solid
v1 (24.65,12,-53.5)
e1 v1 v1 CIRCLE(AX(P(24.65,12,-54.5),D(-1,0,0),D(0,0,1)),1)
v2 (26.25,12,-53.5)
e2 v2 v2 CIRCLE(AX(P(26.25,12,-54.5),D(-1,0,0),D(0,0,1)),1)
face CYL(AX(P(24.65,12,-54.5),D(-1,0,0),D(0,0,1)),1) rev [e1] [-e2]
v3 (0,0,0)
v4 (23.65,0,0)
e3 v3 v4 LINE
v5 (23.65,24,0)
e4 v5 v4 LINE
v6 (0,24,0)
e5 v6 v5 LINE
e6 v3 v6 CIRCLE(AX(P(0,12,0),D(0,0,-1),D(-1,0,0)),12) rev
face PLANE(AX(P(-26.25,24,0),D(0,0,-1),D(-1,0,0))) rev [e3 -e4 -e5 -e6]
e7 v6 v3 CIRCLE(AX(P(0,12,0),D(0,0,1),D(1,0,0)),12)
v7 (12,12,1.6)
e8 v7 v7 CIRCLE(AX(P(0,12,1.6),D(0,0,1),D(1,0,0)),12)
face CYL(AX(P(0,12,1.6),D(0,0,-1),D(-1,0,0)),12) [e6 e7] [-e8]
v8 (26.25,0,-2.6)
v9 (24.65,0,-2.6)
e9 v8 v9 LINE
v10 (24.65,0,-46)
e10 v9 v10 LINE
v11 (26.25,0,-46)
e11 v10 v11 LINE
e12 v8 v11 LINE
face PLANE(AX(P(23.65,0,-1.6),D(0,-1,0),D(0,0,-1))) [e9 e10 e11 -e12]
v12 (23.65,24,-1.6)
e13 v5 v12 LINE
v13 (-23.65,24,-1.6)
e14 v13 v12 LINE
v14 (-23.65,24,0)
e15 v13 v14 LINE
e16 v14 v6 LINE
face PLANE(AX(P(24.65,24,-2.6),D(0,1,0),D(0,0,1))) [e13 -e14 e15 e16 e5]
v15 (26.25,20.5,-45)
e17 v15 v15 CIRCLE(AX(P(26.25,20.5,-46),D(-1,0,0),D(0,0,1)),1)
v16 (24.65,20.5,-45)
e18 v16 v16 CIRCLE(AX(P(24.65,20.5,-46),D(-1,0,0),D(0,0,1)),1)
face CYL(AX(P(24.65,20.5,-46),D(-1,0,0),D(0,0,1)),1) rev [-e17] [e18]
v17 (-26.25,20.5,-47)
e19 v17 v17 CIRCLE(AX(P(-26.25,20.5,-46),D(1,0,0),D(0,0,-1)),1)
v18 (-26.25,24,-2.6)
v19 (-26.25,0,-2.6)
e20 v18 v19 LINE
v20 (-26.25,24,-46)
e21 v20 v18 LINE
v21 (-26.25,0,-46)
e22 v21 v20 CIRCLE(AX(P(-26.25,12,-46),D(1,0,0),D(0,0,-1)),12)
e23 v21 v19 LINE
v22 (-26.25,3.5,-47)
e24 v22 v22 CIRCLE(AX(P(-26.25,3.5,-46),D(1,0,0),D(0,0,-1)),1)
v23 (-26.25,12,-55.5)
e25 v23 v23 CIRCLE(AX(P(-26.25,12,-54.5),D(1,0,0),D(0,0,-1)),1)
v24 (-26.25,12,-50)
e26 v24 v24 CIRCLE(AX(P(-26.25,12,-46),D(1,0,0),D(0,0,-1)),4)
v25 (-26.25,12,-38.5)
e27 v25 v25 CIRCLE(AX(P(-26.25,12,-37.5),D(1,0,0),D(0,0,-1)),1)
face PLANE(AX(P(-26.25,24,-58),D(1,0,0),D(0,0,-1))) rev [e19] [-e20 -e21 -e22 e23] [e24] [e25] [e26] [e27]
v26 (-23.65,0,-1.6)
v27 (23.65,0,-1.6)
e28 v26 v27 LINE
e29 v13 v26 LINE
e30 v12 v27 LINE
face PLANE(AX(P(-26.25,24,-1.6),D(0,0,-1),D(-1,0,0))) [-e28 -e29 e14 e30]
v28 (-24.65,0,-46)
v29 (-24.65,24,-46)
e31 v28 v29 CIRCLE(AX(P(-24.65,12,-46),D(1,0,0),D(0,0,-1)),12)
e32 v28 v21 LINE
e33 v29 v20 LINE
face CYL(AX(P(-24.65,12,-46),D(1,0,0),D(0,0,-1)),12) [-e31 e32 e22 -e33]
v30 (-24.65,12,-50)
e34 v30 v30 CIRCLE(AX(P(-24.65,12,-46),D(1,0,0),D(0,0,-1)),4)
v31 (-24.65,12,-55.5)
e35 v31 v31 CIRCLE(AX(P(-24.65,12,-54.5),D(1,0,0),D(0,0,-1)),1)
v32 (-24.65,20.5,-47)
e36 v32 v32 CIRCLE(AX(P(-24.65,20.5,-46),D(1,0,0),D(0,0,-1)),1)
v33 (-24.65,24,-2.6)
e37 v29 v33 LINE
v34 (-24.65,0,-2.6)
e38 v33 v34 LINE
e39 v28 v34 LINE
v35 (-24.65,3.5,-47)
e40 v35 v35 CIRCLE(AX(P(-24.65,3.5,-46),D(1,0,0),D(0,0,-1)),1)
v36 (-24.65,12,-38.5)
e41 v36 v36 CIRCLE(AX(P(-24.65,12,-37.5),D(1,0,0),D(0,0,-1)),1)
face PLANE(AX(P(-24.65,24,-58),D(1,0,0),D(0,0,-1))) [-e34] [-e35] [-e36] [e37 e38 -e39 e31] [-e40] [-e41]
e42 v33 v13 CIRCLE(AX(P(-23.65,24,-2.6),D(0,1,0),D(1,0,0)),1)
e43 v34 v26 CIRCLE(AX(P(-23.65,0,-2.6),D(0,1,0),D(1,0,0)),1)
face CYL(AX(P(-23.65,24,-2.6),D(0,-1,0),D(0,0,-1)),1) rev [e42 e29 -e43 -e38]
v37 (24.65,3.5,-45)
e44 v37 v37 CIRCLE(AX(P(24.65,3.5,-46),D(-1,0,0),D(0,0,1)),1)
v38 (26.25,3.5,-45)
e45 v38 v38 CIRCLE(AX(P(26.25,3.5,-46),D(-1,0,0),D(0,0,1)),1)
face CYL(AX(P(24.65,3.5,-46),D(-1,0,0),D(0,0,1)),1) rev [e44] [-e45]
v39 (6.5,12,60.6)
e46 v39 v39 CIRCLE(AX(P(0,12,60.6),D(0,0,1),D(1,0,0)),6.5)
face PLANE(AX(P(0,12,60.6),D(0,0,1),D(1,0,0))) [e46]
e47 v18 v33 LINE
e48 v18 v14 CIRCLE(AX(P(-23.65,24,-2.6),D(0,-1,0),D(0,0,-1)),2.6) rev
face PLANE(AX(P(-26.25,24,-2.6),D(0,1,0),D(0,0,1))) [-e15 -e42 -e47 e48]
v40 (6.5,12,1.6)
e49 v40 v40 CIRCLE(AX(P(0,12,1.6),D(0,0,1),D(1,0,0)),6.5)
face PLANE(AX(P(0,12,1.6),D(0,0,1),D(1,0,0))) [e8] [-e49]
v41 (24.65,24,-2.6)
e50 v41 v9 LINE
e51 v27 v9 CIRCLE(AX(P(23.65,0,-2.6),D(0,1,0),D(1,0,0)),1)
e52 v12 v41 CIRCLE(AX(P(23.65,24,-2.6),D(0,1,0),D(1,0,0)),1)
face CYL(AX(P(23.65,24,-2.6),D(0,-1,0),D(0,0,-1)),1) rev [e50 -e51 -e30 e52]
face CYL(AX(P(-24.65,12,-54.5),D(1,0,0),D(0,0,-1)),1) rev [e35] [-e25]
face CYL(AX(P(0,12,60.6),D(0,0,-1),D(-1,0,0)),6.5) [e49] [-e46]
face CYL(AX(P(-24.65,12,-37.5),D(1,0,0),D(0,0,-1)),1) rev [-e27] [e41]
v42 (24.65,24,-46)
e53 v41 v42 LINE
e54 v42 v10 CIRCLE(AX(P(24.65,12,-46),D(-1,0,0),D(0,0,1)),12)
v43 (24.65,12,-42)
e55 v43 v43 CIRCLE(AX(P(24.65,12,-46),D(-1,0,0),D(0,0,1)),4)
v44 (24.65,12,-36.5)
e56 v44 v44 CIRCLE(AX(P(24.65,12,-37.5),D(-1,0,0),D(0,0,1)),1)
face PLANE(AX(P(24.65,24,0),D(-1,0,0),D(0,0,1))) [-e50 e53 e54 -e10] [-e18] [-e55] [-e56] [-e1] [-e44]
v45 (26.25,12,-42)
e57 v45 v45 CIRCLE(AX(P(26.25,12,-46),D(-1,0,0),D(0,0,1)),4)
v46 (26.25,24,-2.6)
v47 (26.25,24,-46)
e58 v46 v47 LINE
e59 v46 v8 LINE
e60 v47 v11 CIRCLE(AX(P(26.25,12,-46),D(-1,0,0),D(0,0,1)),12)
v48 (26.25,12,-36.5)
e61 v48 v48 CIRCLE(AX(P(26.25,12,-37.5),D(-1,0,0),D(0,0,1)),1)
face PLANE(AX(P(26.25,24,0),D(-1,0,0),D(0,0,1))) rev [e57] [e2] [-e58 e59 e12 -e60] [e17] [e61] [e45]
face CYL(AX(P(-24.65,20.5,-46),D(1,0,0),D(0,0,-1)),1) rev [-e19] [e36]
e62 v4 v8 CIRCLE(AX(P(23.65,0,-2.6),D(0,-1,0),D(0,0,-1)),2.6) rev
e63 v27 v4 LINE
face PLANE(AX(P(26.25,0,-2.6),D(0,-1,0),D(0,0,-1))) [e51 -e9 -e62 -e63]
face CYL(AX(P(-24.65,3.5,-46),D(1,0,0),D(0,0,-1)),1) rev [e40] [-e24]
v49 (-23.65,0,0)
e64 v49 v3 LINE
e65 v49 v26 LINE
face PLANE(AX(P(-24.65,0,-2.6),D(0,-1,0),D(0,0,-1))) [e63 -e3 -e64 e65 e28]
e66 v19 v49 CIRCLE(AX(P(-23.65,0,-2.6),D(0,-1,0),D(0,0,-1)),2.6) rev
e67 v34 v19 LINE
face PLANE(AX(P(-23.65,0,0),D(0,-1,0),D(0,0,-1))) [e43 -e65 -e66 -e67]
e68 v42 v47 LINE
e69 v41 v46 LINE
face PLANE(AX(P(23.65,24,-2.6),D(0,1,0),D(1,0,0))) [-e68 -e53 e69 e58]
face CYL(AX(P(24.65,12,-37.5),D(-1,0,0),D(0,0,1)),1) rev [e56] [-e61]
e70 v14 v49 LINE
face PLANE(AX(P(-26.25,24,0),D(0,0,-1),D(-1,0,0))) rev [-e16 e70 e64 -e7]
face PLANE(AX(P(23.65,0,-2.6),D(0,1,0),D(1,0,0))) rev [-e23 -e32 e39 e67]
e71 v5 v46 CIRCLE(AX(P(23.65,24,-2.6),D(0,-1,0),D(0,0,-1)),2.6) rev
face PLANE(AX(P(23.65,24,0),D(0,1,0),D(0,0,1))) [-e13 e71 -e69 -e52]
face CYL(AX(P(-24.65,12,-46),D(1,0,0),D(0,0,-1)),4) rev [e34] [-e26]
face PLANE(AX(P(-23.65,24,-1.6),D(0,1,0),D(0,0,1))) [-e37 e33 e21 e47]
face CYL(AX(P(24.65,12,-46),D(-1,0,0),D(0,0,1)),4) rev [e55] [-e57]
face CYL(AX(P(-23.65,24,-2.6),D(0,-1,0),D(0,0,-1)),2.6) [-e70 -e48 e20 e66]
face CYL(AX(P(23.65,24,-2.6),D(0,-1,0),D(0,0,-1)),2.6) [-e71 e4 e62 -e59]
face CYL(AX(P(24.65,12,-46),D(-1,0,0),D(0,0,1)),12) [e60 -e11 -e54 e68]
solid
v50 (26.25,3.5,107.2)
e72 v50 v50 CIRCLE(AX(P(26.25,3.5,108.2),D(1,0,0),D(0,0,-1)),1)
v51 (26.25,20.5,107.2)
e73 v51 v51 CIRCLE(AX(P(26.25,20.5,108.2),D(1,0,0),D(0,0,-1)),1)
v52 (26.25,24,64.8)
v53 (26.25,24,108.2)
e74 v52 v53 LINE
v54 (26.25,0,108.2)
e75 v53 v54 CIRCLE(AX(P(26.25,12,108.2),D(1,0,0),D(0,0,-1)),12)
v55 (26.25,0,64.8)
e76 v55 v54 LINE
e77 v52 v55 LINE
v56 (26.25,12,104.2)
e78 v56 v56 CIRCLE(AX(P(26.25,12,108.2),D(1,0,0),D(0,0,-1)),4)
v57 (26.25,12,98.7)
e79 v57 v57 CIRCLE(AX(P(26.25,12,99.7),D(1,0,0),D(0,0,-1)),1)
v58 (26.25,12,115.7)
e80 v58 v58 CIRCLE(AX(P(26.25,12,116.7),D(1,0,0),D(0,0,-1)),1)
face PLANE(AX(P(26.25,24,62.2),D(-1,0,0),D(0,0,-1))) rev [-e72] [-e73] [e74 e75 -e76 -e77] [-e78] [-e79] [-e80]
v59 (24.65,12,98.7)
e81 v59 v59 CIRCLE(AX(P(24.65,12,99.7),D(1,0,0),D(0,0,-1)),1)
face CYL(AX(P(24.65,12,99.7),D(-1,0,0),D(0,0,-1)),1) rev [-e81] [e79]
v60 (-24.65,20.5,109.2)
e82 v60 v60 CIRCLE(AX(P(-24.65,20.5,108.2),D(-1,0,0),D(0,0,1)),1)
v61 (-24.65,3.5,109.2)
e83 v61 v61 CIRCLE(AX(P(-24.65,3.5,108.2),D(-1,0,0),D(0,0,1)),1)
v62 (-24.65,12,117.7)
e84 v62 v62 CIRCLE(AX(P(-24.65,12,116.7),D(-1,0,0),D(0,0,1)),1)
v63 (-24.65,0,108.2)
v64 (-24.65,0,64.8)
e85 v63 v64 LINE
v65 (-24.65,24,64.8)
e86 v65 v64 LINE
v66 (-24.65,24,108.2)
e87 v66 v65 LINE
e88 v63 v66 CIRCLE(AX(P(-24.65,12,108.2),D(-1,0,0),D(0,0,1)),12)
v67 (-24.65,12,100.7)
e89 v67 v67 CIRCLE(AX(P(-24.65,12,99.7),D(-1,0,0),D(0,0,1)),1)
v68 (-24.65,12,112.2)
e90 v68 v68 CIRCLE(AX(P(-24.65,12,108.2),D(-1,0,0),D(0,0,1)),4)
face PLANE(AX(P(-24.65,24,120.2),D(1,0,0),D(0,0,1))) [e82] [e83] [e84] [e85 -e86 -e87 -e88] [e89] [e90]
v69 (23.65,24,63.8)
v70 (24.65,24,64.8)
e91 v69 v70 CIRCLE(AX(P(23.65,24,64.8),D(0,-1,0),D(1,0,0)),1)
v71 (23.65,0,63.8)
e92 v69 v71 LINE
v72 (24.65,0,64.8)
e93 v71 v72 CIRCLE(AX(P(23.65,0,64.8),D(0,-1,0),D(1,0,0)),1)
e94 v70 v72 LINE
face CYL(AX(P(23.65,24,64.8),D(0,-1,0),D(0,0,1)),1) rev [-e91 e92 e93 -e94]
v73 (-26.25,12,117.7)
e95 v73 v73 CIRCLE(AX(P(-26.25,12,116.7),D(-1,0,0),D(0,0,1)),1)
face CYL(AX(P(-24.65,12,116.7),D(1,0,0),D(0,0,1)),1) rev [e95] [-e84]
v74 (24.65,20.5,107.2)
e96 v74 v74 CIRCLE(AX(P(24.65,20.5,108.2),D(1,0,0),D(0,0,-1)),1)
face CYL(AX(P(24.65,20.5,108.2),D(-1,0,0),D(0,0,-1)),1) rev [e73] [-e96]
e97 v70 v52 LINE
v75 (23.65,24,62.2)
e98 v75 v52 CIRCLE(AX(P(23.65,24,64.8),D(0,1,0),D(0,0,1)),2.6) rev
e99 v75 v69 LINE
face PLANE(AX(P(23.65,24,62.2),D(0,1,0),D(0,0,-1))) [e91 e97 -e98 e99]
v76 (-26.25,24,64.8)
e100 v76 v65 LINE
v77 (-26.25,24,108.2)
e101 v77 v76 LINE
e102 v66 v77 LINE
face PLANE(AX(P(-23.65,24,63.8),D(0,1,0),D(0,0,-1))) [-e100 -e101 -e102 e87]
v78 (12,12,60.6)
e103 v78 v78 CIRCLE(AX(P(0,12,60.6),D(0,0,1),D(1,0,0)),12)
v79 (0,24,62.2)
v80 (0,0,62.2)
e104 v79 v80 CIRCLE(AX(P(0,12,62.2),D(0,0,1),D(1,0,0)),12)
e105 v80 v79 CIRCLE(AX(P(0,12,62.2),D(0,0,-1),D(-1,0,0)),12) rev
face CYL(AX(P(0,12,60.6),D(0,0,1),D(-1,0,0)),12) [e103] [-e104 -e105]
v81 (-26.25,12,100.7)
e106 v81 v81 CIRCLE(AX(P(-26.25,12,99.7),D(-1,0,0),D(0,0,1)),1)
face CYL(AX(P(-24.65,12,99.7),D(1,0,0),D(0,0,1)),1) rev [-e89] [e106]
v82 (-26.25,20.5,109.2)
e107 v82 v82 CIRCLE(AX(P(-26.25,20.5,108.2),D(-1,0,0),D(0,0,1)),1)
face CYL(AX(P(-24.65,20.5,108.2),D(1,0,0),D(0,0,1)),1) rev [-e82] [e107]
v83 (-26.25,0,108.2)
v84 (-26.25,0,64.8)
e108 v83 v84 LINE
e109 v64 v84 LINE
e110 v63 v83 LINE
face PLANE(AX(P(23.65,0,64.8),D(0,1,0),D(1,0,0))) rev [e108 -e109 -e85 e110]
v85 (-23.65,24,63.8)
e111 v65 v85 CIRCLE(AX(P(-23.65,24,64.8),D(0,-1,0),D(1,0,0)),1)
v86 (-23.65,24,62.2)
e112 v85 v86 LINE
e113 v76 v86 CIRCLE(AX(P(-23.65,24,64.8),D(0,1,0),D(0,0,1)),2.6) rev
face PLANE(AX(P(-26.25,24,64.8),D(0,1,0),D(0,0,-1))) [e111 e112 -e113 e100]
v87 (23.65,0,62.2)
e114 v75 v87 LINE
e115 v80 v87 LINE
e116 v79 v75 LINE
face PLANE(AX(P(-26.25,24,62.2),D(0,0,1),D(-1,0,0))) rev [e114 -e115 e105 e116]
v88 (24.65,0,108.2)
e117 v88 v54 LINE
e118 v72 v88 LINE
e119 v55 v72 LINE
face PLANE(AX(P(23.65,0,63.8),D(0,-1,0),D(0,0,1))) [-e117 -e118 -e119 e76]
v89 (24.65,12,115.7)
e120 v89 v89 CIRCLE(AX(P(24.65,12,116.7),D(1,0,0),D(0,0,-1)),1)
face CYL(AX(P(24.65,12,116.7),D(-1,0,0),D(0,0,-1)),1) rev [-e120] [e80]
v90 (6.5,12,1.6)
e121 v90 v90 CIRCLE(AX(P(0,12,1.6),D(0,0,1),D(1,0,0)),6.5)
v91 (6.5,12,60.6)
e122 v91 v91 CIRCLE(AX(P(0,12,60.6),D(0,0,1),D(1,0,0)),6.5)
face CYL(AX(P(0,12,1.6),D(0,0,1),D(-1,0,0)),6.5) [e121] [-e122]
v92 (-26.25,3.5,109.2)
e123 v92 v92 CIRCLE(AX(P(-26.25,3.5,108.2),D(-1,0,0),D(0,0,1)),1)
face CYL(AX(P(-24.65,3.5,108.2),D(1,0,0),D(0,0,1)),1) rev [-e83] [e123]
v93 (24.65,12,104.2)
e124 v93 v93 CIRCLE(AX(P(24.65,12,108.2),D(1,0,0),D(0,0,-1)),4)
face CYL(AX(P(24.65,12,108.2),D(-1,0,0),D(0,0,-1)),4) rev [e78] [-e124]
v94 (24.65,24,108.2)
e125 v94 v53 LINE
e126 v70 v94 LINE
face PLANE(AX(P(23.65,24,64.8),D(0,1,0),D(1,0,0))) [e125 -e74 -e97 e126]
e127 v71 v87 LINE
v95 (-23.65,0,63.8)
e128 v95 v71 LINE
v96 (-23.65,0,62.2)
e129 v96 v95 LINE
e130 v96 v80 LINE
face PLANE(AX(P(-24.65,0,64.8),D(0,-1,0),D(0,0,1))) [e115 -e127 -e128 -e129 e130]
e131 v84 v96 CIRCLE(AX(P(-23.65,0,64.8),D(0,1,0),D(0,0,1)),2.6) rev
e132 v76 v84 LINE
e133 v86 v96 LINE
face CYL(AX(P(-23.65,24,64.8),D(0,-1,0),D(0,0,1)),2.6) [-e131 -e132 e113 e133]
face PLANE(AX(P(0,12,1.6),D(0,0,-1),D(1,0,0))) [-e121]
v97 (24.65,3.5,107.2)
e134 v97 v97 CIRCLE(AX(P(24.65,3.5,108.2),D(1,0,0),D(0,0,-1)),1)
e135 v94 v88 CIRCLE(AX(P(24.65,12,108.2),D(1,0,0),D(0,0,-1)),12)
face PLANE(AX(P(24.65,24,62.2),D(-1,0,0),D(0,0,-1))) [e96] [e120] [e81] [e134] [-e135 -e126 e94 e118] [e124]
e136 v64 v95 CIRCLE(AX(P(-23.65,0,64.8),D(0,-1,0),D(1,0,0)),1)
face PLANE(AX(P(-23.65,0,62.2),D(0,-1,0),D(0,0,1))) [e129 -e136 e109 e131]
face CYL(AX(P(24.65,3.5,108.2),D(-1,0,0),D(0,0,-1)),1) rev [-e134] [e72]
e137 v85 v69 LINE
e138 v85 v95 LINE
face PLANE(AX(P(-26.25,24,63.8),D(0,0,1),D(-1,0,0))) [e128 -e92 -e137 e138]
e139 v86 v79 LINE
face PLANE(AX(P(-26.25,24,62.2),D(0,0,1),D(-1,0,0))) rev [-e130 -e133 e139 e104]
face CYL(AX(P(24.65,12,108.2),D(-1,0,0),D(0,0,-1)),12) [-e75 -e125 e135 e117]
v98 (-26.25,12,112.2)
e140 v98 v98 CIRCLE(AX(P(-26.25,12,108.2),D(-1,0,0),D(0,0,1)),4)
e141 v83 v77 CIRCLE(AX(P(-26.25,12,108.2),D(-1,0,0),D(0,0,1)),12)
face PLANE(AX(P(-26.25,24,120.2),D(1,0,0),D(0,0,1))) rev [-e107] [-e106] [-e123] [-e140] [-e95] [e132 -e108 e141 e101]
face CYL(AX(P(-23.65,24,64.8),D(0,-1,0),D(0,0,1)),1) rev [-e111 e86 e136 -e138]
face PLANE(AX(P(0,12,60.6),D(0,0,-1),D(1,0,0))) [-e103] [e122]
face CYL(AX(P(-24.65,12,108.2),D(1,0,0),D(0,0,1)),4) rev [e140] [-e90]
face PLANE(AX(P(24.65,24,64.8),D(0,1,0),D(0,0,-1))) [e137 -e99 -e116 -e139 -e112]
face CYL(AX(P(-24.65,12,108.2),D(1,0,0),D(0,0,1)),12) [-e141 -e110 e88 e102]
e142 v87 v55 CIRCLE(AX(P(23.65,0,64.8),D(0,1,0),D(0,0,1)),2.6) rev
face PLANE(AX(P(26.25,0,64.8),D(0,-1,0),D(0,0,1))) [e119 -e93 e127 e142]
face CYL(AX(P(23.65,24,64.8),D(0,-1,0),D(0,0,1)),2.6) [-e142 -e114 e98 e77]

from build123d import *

# Parameters (mm, degrees)
BASE_FLANGE1_DEPTH      = 24
CUT_EXTRUDE1_DEPTH      = 69.037214082
CUT_EXTRUDE1_DEPTH_BACK = 69.037214082
SKETCH5_R               = 1
SKETCH5_R_2             = 4
SKETCH6_R               = 12
BOSS_EXTRUDE1_DEPTH     = 1.6
SKETCH7_R               = 6.5
BOSS_EXTRUDE2_DEPTH     = 59


# Sheet-metal steps are written as plain solids
with BuildPart() as part:
    # Sketch1 → Base-Flange1 (new body)
    with BuildSketch(Plane(origin=(0, 0, 0), x_dir=(1, 0, 0), z_dir=(0, 1, 0))):
        with BuildLine():
            Line((-26.25, 58), (-26.25, 2.6))
            ThreePointArc((-26.25, 2.6), (-25.488477631, 0.761522369), (-23.65, 0))
            Line((-23.65, 0), (23.65, 0))
            ThreePointArc((23.65, 0), (25.488477631, 0.761522369), (26.25, 2.6))
            Line((26.25, 2.6), (26.25, 58))
            Line((26.25, 58), (24.65, 58))
            Line((24.65, 58), (24.65, 2.6))
            ThreePointArc((24.65, 2.6), (24.357106781, 1.892893219), (23.65, 1.6))
            Line((23.65, 1.6), (-23.65, 1.6))
            ThreePointArc((-23.65, 1.6), (-24.357106781, 1.892893219), (-24.65, 2.6))
            Line((-24.65, 2.6), (-24.65, 58))
            Line((-24.65, 58), (-26.25, 58))
        make_face()
    extrude(amount=BASE_FLANGE1_DEPTH)

    # Sketch5 → Cut-Extrude1 (cut, two sides: drawn at the far end of the back side and taken through both)
    with BuildSketch(Plane(origin=(0, 0, 0), x_dir=(0, 0, -1), z_dir=(1, 0, 0)).offset(-CUT_EXTRUDE1_DEPTH_BACK)):
        with BuildLine():
            Line((58, 12), (58, 24))
            Line((58, 24), (46, 24))
            ThreePointArc((46, 24), (54.485281374, 20.485281374), (58, 12))
        make_face()
        with BuildLine():
            Line((58, 0), (58, 12))
            ThreePointArc((58, 12), (54.485281374, 3.514718626), (46, 0))
            Line((46, 0), (58, 0))
        make_face()
        with Locations(Location((37.5, 12, 0), (0, 0, 180))):
            Circle(SKETCH5_R)
        with Locations(Location((46, 3.5, 0), (0, 0, 180))):
            Circle(SKETCH5_R)
        with Locations(Location((54.5, 12, 0), (0, 0, 180))):
            Circle(SKETCH5_R)
        with Locations(Location((46, 20.5, 0), (0, 0, 180))):
            Circle(SKETCH5_R)
        with Locations(Location((46, 12, 0), (0, 0, 180))):
            Circle(SKETCH5_R_2)
    extrude(amount=CUT_EXTRUDE1_DEPTH + CUT_EXTRUDE1_DEPTH_BACK, mode=Mode.SUBTRACT)

    # Sketch6 → Boss-Extrude1 (add)
    with BuildSketch(Plane.XY):
        with Locations(Location((0, 12, 0), (0, 0, 270))):
            Circle(SKETCH6_R)
    extrude(amount=BOSS_EXTRUDE1_DEPTH)

    # Sketch7 → Boss-Extrude2 (add)
    with BuildSketch(Plane.XY.offset(1.6)):
        with Locations((0, 12)):
            Circle(SKETCH7_R)
    extrude(amount=BOSS_EXTRUDE2_DEPTH)


with BuildPart() as body_2:
    # Mirror1: mirrored copy
    add(part.part.mirror(Plane.XY.offset(31.1)))


solid = Compound([part.part, body_2.part])
